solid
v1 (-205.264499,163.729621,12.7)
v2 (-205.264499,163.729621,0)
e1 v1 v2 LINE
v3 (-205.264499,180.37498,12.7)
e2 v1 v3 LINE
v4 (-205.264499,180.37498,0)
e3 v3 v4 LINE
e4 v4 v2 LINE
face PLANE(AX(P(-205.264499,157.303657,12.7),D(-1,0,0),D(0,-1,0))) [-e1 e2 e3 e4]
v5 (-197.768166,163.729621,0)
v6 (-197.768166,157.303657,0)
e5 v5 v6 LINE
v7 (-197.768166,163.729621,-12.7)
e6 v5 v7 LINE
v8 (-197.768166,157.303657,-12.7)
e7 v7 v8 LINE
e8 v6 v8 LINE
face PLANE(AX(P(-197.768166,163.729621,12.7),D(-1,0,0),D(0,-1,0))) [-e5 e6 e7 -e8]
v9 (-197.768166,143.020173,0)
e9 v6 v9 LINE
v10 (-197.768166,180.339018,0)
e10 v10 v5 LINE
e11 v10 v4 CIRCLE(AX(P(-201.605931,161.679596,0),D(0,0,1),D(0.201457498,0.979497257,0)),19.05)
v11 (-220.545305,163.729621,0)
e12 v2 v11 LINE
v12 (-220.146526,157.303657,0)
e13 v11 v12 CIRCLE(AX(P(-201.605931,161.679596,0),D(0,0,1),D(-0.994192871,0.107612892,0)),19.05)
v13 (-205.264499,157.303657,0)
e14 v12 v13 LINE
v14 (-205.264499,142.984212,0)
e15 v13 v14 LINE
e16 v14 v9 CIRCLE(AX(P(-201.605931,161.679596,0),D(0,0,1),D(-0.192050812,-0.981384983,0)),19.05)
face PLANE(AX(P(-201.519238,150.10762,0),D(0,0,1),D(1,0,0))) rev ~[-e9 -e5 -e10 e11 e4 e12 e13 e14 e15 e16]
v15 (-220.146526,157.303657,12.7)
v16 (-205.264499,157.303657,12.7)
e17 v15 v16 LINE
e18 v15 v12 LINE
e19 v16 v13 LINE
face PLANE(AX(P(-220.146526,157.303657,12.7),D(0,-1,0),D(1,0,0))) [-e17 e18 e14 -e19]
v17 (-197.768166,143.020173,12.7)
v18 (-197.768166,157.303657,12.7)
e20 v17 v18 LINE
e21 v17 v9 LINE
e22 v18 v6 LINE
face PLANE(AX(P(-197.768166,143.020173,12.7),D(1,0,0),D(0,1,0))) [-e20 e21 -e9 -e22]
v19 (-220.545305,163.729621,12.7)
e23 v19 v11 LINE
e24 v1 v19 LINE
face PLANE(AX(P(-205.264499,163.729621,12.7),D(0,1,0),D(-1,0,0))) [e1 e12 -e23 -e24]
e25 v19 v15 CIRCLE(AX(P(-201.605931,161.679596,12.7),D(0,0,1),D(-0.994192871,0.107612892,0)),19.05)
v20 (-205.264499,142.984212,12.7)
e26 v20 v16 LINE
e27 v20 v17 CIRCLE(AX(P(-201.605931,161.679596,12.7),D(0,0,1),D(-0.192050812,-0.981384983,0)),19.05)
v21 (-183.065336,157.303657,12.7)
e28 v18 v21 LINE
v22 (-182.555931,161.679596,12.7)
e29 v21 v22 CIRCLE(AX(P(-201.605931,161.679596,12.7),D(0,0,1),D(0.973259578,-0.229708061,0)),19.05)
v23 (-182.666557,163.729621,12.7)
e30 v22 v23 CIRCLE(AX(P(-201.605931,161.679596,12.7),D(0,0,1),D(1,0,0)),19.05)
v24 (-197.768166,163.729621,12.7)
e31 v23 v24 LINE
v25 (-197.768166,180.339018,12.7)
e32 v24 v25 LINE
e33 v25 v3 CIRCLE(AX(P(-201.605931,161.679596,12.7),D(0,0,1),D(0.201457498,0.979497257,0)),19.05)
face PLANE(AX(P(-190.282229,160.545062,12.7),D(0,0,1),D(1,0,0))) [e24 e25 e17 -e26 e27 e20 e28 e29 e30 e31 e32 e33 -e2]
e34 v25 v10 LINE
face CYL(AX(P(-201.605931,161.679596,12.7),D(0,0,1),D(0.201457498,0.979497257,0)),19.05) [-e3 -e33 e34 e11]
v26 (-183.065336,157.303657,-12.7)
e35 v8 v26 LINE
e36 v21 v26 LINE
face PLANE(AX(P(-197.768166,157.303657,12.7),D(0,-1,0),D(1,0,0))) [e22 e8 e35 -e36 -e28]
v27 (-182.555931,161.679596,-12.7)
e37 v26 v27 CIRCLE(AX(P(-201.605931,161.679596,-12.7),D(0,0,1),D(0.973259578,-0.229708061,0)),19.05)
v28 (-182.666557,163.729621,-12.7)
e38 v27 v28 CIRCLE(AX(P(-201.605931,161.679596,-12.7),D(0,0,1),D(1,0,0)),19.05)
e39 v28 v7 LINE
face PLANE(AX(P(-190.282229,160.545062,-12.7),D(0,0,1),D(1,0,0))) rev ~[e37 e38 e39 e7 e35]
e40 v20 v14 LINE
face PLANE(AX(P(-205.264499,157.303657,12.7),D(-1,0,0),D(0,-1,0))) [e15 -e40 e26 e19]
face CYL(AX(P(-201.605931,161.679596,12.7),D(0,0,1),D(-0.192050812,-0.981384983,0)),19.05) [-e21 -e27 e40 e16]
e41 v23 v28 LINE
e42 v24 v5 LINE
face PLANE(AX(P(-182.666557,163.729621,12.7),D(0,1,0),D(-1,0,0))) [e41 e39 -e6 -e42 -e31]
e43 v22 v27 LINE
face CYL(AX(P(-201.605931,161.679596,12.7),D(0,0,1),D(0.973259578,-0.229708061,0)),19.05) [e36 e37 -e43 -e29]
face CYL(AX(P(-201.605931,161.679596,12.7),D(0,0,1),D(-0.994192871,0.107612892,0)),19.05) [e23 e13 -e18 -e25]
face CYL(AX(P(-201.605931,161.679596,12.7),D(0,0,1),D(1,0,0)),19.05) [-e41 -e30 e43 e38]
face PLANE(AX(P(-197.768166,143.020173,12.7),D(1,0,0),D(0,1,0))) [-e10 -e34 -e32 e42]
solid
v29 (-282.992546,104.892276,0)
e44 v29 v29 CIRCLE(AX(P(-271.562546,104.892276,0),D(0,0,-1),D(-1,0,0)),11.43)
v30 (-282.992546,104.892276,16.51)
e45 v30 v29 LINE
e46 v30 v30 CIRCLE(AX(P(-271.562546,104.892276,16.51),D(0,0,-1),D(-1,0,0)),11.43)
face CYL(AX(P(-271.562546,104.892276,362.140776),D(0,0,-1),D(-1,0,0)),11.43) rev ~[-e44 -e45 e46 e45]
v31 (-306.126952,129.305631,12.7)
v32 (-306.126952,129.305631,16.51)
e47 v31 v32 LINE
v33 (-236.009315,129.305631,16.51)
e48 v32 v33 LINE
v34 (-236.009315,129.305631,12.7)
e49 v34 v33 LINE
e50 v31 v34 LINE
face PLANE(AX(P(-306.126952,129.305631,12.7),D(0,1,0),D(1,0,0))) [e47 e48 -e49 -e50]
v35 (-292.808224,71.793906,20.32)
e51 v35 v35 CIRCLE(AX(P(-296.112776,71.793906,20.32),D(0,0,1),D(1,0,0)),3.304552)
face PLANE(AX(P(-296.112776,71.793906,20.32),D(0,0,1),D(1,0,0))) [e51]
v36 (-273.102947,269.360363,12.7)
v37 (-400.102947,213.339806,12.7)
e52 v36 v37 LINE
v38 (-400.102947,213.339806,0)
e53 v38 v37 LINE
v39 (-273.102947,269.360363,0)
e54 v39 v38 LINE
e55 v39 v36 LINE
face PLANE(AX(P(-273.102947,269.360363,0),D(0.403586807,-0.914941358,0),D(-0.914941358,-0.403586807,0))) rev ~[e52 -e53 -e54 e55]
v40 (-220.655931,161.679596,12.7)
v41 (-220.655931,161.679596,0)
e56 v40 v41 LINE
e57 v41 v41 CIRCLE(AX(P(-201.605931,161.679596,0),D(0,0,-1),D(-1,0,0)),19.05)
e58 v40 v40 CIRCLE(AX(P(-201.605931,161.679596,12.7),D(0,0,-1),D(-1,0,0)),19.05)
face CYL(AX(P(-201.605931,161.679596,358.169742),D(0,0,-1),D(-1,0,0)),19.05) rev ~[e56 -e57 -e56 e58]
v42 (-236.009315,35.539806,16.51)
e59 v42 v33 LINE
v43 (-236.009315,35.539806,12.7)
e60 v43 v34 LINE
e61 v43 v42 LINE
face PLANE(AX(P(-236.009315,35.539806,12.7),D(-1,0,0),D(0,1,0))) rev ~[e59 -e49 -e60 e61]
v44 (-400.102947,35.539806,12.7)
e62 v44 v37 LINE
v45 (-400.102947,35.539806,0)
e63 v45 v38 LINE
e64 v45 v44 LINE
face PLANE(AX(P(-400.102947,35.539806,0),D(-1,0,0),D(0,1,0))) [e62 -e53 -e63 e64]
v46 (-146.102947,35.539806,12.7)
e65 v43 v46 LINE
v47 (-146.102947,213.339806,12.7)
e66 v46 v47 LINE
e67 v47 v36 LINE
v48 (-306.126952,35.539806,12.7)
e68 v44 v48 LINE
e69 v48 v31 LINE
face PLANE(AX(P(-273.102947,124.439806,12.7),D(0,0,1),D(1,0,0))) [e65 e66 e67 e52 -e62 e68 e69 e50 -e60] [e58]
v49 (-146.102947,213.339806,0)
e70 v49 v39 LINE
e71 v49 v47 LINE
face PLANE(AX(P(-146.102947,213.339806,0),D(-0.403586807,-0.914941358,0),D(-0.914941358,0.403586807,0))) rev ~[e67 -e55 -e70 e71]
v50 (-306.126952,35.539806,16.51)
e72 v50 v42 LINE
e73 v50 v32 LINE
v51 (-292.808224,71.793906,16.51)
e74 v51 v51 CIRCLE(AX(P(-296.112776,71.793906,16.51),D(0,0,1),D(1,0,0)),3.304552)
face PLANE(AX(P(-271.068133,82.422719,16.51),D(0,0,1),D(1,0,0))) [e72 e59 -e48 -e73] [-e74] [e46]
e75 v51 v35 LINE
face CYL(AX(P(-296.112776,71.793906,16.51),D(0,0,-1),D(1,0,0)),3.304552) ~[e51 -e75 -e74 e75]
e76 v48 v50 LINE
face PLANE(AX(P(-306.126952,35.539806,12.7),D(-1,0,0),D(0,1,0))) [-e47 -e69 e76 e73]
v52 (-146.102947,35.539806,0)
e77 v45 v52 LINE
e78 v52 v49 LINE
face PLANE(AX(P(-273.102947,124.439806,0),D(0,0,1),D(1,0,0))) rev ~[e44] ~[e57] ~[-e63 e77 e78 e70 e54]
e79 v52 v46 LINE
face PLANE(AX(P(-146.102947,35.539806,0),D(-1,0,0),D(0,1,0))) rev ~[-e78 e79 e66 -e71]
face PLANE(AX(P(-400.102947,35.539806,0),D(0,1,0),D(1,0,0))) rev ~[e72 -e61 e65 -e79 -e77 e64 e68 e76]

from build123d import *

# Parameters (mm, degrees)
F0_W      = 254
F0_H      = 177.8
F1_DEPTH  = 12.7
F3_D      = 38.1
F4_W      = 70.1176375151
F4_H      = 93.7658244599
F5_DEPTH  = 3.81
F7_D      = 22.86
F9_DEPTH  = 12.7
F8_W      = 7.4963332962
F8_H      = 6.4259641575
F10_DEPTH = 12.7
F11_DEPTH = 12.7
F12_DEPTH = 25.4
F13_DEPTH = 12.7
F14_R     = 3.3045515418
F15_DEPTH = 3.81


with BuildPart() as f1:
    # F0 (on Top) → F1 (new body)
    with BuildSketch(Plane.XY):
        with Locations((-273.1029465795, 124.4398064624)):
            Rectangle(F0_W, F0_H)
        Polygon((-273.1029465795, 269.3603634834), (-400.1029465795, 213.3398064624), (-146.1029465795, 213.3398064624), align=None)
    extrude(amount=F1_DEPTH)

    # F3 (through all)
    with Locations(Plane.XY.offset(12.7)):
        with Locations((-201.6059309244, 161.6795957088)):
            Hole(F3_D / 2)

    # F4 (on face) → F5 (join)
    with BuildSketch(Plane.XY.offset(12.7)):
        with Locations((-271.0681334138, 82.4227186924)):
            Rectangle(F4_W, F4_H)
    extrude(amount=F5_DEPTH)

    # F7 (through all)
    with Locations(Plane.XY.offset(16.51)):
        with Locations((-271.5625464916, 104.8922762275)):
            Hole(F7_D / 2)

    # F14 (on face) → F15 (join)
    with BuildSketch(Plane.XY.offset(16.51)):
        with Locations((-296.1127758026, 71.7939063907)):
            Circle(F14_R)
    extrude(amount=F15_DEPTH)


with BuildPart() as f9:
    # F8 (on face) → F9 (new body)
    with BuildSketch(Plane.XY.offset(12.7)):
        with BuildLine():
            ThreePointArc((-197.7681655949, 180.3390184565), (-201.514545885, 180.7293765153), (-205.2644988911, 180.3749796427))
            Line((-205.2644988911, 180.3749796427), (-205.2644988911, 163.7296213064))
            Line((-205.2644988911, 163.7296213064), (-197.7681655949, 163.7296213064))
            Line((-197.7681655949, 163.7296213064), (-197.7681655949, 180.3390184565))
        make_face()
    extrude(amount=-F9_DEPTH)

    # F8 (on face) → F10 (join)
    with BuildSketch(Plane.XY.offset(12.7)):
        with Locations((-201.516332243, 160.5166392277)):
            Rectangle(F8_W, F8_H)
    extrude(amount=-F10_DEPTH)

    # F8 (on face) → F11 (join)
    with BuildSketch(Plane.XY.offset(12.7)):
        with BuildLine():
            Line((-197.7681655949, 157.3036571489), (-205.2644988911, 157.3036571489))
            Line((-205.2644988911, 157.3036571489), (-205.2644988911, 142.984211775))
            ThreePointArc((-205.2644988911, 142.984211775), (-201.514545885, 142.6298149024), (-197.7681655949, 143.0201729612))
            Line((-197.7681655949, 143.0201729612), (-197.7681655949, 157.3036571489))
        make_face()
    extrude(amount=-F11_DEPTH)

    # F8 (on face) → F12 (join)
    with BuildSketch(Plane.XY.offset(12.7)):
        with BuildLine():
            Line((-182.6665567254, 163.7296213064), (-197.7681655949, 163.7296213064))
            Line((-197.7681655949, 163.7296213064), (-197.7681655949, 157.3036571489))
            Line((-197.7681655949, 157.3036571489), (-183.0653359577, 157.3036571489))
            ThreePointArc((-183.0653359577, 157.3036571489), (-182.6837107307, 159.4768512974), (-182.5559309244, 161.6795957088))
            ThreePointArc((-182.5559309244, 161.6795957088), (-182.5836074794, 162.7060998514), (-182.6665567254, 163.7296213064))
        make_face()
    extrude(amount=-F12_DEPTH)

    # F8 (on face) → F13 (join)
    with BuildSketch(Plane.XY.offset(12.7)):
        with BuildLine():
            Line((-205.2644988911, 157.3036571489), (-205.2644988911, 163.7296213064))
            Line((-205.2644988911, 163.7296213064), (-220.5453051234, 163.7296213064))
            ThreePointArc((-220.5453051234, 163.7296213064), (-220.6193544984, 160.4996702891), (-220.1465258911, 157.3036571489))
            Line((-220.1465258911, 157.3036571489), (-205.2644988911, 157.3036571489))
        make_face()
    extrude(amount=-F13_DEPTH)


solid = Compound([f1.part, f9.part])
